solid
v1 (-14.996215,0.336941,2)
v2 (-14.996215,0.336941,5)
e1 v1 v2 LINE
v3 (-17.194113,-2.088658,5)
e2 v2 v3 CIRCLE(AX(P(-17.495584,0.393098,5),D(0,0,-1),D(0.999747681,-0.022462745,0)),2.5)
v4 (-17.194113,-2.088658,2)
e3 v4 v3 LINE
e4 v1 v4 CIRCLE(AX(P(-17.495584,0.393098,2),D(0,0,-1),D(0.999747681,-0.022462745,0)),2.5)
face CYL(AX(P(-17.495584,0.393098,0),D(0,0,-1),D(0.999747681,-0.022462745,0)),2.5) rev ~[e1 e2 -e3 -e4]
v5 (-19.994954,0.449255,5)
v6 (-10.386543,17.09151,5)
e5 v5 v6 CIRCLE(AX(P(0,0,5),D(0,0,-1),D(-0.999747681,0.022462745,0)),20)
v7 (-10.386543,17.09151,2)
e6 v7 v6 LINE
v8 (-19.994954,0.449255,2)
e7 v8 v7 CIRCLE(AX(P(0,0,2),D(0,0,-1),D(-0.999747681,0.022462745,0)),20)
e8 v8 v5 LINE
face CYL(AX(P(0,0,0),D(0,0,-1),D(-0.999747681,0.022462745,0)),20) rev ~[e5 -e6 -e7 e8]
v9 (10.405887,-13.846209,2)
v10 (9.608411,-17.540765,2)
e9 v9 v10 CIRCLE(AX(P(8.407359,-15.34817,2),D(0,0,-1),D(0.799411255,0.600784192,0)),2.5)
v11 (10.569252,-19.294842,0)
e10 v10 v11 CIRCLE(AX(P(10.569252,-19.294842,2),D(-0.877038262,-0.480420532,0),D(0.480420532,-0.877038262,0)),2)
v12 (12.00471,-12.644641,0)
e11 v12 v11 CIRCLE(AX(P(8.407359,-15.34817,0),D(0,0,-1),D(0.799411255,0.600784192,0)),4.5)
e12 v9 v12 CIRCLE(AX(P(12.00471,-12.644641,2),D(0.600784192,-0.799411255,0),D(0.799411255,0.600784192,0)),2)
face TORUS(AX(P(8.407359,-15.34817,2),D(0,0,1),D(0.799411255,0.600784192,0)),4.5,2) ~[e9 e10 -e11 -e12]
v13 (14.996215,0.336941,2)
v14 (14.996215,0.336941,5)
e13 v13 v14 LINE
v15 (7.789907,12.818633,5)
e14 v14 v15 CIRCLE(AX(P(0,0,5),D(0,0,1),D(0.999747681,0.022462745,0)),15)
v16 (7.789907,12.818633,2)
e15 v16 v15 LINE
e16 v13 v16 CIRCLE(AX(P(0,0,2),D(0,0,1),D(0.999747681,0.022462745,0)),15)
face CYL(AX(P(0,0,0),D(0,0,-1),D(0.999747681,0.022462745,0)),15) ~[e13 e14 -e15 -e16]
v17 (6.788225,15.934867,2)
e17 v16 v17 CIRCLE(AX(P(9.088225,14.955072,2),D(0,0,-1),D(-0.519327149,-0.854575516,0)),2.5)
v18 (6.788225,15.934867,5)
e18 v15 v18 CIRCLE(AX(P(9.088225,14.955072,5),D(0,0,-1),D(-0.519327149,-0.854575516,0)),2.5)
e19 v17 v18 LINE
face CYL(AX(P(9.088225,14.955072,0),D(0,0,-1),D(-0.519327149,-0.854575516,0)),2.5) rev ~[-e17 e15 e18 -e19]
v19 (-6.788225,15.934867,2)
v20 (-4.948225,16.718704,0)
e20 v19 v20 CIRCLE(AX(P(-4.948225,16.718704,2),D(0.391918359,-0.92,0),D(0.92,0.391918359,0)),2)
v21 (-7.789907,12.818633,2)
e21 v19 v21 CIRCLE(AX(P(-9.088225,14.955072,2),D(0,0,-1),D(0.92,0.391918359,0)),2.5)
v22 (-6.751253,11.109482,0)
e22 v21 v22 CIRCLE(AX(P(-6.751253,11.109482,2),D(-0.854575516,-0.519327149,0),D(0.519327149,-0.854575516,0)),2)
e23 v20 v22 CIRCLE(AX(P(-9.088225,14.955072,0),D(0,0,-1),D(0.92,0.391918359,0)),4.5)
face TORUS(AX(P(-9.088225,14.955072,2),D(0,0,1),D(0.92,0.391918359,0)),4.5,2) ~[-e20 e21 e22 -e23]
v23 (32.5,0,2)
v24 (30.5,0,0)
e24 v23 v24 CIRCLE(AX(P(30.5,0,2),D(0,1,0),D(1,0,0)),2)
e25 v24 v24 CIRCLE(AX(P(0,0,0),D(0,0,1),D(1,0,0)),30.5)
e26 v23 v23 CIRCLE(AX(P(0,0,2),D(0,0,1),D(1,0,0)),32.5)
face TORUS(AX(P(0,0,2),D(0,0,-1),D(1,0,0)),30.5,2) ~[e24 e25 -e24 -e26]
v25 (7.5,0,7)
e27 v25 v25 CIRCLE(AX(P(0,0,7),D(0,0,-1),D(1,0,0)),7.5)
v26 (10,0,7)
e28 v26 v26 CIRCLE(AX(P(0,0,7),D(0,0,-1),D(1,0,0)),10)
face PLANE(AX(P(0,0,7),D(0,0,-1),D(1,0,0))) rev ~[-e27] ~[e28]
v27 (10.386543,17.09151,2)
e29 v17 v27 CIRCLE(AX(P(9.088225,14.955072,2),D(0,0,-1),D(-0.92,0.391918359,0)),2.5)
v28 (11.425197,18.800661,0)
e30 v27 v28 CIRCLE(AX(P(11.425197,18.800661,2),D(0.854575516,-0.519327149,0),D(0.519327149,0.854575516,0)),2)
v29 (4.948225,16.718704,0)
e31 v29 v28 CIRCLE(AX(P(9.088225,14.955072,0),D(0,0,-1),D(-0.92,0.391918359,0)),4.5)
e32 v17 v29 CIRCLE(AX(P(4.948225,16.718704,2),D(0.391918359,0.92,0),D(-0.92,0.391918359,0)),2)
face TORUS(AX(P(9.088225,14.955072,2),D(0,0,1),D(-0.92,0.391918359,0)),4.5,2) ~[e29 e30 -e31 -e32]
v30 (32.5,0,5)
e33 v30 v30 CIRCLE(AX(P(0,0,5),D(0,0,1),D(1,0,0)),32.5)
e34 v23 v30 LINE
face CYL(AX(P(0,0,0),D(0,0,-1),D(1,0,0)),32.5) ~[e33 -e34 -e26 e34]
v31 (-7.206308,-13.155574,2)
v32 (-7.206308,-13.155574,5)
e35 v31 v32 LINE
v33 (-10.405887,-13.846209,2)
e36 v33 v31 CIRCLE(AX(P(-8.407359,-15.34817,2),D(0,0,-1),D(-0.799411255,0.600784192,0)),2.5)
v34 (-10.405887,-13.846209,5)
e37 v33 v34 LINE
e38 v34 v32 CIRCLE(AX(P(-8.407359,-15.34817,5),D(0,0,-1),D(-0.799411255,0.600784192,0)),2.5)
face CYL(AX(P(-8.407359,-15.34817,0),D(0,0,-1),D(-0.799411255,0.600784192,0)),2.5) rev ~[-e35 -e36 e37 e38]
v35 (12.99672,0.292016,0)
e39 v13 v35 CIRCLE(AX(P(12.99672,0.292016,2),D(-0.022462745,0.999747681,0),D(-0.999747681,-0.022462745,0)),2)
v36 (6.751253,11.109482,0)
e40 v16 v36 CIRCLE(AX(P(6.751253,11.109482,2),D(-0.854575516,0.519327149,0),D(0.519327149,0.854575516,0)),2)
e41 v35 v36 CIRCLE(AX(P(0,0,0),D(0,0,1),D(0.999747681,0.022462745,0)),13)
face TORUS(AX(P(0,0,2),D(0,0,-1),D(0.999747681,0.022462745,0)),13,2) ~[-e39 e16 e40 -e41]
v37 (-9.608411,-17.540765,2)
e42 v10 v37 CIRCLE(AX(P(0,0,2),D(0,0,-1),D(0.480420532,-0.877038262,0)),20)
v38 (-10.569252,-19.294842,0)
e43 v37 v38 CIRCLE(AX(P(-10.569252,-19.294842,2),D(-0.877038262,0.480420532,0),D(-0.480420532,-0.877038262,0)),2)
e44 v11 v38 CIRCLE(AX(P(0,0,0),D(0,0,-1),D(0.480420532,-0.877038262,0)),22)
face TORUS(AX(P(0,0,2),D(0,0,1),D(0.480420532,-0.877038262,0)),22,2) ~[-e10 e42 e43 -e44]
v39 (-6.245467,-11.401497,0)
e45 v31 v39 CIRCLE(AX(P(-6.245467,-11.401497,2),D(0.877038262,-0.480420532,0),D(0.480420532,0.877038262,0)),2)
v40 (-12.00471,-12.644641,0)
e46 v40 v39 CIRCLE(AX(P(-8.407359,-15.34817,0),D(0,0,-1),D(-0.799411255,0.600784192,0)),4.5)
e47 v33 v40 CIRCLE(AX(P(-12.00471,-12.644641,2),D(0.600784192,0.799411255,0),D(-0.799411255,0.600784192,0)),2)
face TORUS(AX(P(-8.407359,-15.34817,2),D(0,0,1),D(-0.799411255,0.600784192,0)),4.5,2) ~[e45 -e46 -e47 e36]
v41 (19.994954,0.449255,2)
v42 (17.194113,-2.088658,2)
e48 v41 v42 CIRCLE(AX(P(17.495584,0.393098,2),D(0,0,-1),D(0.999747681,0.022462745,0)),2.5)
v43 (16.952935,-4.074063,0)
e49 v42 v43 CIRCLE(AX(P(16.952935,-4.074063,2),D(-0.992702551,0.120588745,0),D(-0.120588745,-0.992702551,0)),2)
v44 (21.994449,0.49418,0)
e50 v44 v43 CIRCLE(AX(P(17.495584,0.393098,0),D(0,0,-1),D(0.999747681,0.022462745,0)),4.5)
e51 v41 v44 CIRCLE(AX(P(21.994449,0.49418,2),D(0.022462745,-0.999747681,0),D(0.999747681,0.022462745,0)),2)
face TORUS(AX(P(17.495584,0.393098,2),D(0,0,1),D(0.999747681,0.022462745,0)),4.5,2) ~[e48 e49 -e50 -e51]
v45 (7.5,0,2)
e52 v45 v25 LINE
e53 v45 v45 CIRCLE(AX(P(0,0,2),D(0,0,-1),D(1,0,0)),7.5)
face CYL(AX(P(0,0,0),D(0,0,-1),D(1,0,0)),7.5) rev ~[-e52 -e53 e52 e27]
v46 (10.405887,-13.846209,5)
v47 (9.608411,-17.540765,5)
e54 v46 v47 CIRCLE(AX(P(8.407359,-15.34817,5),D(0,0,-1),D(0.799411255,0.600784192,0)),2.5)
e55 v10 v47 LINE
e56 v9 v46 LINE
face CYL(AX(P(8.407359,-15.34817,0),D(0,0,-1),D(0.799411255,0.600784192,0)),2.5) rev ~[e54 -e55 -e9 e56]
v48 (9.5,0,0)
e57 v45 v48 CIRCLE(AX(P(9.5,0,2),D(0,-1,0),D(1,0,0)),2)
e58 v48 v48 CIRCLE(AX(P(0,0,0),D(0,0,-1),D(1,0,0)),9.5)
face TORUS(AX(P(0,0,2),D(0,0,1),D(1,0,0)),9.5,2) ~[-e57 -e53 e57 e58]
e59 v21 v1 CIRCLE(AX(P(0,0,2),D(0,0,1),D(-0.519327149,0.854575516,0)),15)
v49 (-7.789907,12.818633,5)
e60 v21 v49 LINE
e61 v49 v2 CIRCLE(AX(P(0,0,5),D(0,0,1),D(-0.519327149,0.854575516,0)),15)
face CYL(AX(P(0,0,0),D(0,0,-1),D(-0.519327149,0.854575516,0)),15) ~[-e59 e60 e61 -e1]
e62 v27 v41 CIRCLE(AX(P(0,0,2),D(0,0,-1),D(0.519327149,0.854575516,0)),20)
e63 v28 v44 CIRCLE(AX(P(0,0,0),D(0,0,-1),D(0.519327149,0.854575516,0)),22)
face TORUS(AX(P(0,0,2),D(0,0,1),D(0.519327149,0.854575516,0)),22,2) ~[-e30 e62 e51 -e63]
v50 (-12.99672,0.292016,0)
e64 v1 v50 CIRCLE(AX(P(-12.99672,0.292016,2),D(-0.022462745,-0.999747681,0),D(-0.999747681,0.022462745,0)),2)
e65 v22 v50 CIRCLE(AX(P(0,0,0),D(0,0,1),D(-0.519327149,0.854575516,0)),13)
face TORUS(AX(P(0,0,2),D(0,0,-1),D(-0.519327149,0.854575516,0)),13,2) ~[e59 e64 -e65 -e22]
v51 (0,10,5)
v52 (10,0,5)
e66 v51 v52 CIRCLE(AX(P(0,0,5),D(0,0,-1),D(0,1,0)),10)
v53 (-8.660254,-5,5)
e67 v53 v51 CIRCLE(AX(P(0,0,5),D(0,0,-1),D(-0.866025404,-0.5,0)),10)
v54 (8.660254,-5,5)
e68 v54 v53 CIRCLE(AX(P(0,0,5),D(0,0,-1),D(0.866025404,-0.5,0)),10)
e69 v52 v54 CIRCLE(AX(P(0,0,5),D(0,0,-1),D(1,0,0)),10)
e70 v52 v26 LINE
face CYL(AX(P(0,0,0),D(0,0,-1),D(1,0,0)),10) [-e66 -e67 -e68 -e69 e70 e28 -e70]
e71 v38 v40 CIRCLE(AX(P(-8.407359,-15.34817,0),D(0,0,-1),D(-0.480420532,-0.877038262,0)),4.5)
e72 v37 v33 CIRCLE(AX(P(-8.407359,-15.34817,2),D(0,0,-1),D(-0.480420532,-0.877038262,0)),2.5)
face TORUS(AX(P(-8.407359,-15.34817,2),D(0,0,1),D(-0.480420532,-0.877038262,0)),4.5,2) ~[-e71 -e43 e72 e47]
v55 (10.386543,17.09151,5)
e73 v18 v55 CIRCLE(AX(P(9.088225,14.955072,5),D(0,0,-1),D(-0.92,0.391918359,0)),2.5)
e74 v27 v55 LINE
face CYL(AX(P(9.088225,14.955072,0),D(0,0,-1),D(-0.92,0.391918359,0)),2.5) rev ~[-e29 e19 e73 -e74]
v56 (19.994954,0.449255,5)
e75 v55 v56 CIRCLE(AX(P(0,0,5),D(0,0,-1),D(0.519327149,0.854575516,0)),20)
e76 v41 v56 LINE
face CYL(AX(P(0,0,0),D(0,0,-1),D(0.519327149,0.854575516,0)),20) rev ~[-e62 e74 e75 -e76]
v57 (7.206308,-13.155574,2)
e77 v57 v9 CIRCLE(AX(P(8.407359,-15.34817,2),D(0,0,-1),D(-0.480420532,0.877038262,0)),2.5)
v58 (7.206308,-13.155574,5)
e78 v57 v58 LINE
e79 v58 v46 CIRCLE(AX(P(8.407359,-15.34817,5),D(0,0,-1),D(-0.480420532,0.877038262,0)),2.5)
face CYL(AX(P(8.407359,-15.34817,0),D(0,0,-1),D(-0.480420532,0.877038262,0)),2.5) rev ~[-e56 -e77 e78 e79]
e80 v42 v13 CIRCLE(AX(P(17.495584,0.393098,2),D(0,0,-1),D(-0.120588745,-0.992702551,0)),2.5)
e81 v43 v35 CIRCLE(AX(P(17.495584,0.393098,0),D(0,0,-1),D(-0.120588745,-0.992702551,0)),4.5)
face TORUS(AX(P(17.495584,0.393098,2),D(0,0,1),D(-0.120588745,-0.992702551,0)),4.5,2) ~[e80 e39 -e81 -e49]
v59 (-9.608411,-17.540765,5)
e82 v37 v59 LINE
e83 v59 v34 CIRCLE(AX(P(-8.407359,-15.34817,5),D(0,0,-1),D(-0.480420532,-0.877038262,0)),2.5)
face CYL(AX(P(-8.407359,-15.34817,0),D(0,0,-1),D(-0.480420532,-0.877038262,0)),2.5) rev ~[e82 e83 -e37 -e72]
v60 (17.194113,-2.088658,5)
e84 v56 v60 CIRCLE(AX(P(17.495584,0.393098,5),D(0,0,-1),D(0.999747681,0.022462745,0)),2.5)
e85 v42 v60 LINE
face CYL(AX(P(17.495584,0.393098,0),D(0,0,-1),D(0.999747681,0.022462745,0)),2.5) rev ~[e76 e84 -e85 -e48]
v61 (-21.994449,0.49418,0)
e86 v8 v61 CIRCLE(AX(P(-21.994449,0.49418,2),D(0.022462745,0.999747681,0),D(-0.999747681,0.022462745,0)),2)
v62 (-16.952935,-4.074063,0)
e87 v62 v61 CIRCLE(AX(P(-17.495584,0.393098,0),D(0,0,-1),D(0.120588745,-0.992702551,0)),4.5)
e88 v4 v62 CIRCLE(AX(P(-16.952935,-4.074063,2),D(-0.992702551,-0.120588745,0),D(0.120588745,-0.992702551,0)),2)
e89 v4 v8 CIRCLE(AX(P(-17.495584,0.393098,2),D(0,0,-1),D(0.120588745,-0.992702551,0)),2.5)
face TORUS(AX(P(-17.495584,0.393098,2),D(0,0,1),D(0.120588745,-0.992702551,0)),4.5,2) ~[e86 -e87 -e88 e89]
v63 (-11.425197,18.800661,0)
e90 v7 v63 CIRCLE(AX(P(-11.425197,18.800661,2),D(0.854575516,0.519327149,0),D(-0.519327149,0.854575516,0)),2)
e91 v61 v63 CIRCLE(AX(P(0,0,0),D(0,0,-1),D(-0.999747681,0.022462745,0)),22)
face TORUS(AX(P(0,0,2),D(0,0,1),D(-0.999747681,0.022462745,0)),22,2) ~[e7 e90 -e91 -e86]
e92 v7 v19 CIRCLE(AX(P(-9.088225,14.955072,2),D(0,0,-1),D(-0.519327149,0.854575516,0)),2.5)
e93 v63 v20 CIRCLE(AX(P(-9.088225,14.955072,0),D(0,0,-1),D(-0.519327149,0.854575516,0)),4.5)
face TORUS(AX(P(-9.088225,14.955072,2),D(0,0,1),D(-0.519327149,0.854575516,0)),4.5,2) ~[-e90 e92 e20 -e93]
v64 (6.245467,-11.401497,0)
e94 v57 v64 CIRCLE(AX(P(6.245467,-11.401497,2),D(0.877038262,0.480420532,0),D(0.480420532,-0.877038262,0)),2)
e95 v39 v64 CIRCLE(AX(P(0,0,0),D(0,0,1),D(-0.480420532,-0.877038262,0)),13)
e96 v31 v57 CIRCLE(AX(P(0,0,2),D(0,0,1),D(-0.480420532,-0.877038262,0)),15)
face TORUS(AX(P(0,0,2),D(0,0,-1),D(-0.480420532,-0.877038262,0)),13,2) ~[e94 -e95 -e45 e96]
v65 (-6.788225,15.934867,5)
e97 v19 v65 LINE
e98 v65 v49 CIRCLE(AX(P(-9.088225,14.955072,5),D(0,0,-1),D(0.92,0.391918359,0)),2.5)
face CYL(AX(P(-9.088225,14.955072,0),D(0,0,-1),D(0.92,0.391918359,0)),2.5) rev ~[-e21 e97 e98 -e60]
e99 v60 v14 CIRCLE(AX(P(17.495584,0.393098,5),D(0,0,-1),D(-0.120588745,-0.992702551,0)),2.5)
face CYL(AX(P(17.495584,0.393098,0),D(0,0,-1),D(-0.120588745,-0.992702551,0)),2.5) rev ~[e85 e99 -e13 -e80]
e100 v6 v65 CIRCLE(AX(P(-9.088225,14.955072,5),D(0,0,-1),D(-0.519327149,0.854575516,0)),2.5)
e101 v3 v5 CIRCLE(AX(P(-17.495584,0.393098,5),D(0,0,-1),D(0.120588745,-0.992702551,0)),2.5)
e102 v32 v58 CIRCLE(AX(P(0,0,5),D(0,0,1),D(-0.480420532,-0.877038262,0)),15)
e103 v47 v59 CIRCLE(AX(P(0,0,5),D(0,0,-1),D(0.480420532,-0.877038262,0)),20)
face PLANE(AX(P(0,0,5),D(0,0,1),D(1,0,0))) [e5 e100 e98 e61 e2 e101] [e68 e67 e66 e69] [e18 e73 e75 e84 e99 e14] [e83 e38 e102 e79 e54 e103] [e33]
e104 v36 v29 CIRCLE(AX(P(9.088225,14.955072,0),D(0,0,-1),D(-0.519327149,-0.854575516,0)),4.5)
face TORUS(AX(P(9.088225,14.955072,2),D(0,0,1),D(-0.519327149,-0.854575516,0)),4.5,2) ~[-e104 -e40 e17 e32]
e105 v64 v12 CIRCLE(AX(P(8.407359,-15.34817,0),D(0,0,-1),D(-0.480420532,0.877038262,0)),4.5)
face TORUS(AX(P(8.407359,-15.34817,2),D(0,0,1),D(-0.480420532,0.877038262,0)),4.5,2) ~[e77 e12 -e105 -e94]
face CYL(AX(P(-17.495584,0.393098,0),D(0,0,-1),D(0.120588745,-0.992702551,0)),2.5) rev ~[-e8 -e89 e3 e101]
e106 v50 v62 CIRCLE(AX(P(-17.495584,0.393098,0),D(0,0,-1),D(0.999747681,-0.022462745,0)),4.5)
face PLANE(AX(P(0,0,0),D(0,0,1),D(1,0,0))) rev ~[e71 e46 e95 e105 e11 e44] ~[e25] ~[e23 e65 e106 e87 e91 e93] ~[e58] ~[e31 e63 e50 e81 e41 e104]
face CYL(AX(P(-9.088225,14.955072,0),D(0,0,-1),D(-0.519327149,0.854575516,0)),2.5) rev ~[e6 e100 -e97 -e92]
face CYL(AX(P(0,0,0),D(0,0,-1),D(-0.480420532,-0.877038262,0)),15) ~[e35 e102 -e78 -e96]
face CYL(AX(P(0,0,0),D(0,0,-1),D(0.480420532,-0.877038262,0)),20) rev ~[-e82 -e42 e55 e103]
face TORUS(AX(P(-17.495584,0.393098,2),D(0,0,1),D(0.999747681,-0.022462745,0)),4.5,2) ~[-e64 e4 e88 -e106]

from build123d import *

# Parameters (mm, degrees)
F0_R     = 32.5
F1_DEPTH = 5
F2_R     = 10
F2_R_2   = 7.5
F3_DEPTH = 7
F4_R     = 2


with BuildPart() as f1:
    # F0 (on Top) → F1 (new body)
    with BuildSketch(Plane.XY):
        Circle(F0_R)
        with BuildLine():
            ThreePointArc((-9.6084106433, -17.5407652316), (-10.8510784968, -15.8756509046), (-10.4058874503, -13.8462090975))
            ThreePointArc((-10.4058874503, -13.8462090975), (-8.9348406398, -12.9044503937), (-7.2063079825, -13.1555739237))
            ThreePointArc((-7.2063079825, -13.1555739237), (0, -15), (7.2063079825, -13.1555739237))
            ThreePointArc((7.2063079825, -13.1555739237), (8.9348406398, -12.9044503937), (10.4058874503, -13.8462090975))
            ThreePointArc((10.4058874503, -13.8462090975), (10.8510784968, -15.8756509046), (9.6084106433, -17.5407652316))
            ThreePointArc((9.6084106433, -17.5407652316), (0, -20), (-9.6084106433, -17.5407652316))
        make_face(mode=Mode.SUBTRACT)
        with BuildLine():
            ThreePointArc((-19.994953614, 0.4492549087), (-17.3205080757, 10), (-10.3865429707, 17.0915103229))
            ThreePointArc((-10.3865429707, 17.0915103229), (-8.3231777366, 17.335135089), (-6.7882250994, 15.9348674296))
            ThreePointArc((-6.7882250994, 15.9348674296), (-6.708161543, 14.1900241697), (-7.789907228, 12.8186327422))
            ThreePointArc((-7.789907228, 12.8186327422), (-12.9903810568, 7.5), (-14.9962152105, 0.3369411815))
            ThreePointArc((-14.9962152105, 0.3369411815), (-15.6430021828, -1.285573776), (-17.1941125497, -2.0886583321))
            ThreePointArc((-17.1941125497, -2.0886583321), (-19.1742562334, -1.4594841844), (-19.994953614, 0.4492549087))
        make_face(mode=Mode.SUBTRACT)
        with BuildLine():
            ThreePointArc((0, 10), (7.0710678119, 7.0710678119), (10, 0))
            ThreePointArc((10, 0), (9.6592582629, -2.588190451), (8.6602540378, -5))
            ThreePointArc((8.6602540378, -5), (0, -10), (-8.6602540378, -5))
            ThreePointArc((-8.6602540378, -5), (-8.6602540378, 5), (0, 10))
        make_face(mode=Mode.SUBTRACT)
        with BuildLine():
            ThreePointArc((19.994953614, 0.4492549087), (19.1742562334, -1.4594841844), (17.1941125497, -2.0886583321))
            ThreePointArc((17.1941125497, -2.0886583321), (15.6430021828, -1.285573776), (14.9962152105, 0.3369411815))
            ThreePointArc((14.9962152105, 0.3369411815), (12.9903810568, 7.5), (7.789907228, 12.8186327422))
            ThreePointArc((7.789907228, 12.8186327422), (6.708161543, 14.1900241697), (6.7882250994, 15.9348674296))
            ThreePointArc((6.7882250994, 15.9348674296), (8.3231777366, 17.335135089), (10.3865429707, 17.0915103229))
            ThreePointArc((10.3865429707, 17.0915103229), (17.3205080757, 10), (19.994953614, 0.4492549087))
        make_face(mode=Mode.SUBTRACT)
    extrude(amount=F1_DEPTH)

    # F2 (on face) → F3 (join)
    with BuildSketch(Plane(origin=(0, 0, 0), x_dir=(1, 0, 0), z_dir=(0, 0, -1))):
        Circle(F2_R)
        Circle(F2_R_2, mode=Mode.SUBTRACT)
    extrude(amount=-F3_DEPTH)

    # F4
    f4_edges = [f1.edges().sort_by_distance(p)[0] for p in [
        (-32.5, 0, 0),
        (-10.599955, -14.147118, 0),
        (0, -15, 0),
        (10.599955, -14.147118, 0),
        (0, -20, 0),
        (-17.320508, 10, 0),
        (-6.951786, 16.253389, 0),
        (-12.990381, 7.5, 0),
        (-17.551741, -2.106271, 0),
        (17.551741, -2.106271, 0),
        (12.990381, 7.5, 0),
        (6.951786, 16.253389, 0),
        (17.320508, 10, 0),
        (-7.5, 0, 0),
    ]]
    fillet(f4_edges, radius=F4_R)


solid = f1.part
